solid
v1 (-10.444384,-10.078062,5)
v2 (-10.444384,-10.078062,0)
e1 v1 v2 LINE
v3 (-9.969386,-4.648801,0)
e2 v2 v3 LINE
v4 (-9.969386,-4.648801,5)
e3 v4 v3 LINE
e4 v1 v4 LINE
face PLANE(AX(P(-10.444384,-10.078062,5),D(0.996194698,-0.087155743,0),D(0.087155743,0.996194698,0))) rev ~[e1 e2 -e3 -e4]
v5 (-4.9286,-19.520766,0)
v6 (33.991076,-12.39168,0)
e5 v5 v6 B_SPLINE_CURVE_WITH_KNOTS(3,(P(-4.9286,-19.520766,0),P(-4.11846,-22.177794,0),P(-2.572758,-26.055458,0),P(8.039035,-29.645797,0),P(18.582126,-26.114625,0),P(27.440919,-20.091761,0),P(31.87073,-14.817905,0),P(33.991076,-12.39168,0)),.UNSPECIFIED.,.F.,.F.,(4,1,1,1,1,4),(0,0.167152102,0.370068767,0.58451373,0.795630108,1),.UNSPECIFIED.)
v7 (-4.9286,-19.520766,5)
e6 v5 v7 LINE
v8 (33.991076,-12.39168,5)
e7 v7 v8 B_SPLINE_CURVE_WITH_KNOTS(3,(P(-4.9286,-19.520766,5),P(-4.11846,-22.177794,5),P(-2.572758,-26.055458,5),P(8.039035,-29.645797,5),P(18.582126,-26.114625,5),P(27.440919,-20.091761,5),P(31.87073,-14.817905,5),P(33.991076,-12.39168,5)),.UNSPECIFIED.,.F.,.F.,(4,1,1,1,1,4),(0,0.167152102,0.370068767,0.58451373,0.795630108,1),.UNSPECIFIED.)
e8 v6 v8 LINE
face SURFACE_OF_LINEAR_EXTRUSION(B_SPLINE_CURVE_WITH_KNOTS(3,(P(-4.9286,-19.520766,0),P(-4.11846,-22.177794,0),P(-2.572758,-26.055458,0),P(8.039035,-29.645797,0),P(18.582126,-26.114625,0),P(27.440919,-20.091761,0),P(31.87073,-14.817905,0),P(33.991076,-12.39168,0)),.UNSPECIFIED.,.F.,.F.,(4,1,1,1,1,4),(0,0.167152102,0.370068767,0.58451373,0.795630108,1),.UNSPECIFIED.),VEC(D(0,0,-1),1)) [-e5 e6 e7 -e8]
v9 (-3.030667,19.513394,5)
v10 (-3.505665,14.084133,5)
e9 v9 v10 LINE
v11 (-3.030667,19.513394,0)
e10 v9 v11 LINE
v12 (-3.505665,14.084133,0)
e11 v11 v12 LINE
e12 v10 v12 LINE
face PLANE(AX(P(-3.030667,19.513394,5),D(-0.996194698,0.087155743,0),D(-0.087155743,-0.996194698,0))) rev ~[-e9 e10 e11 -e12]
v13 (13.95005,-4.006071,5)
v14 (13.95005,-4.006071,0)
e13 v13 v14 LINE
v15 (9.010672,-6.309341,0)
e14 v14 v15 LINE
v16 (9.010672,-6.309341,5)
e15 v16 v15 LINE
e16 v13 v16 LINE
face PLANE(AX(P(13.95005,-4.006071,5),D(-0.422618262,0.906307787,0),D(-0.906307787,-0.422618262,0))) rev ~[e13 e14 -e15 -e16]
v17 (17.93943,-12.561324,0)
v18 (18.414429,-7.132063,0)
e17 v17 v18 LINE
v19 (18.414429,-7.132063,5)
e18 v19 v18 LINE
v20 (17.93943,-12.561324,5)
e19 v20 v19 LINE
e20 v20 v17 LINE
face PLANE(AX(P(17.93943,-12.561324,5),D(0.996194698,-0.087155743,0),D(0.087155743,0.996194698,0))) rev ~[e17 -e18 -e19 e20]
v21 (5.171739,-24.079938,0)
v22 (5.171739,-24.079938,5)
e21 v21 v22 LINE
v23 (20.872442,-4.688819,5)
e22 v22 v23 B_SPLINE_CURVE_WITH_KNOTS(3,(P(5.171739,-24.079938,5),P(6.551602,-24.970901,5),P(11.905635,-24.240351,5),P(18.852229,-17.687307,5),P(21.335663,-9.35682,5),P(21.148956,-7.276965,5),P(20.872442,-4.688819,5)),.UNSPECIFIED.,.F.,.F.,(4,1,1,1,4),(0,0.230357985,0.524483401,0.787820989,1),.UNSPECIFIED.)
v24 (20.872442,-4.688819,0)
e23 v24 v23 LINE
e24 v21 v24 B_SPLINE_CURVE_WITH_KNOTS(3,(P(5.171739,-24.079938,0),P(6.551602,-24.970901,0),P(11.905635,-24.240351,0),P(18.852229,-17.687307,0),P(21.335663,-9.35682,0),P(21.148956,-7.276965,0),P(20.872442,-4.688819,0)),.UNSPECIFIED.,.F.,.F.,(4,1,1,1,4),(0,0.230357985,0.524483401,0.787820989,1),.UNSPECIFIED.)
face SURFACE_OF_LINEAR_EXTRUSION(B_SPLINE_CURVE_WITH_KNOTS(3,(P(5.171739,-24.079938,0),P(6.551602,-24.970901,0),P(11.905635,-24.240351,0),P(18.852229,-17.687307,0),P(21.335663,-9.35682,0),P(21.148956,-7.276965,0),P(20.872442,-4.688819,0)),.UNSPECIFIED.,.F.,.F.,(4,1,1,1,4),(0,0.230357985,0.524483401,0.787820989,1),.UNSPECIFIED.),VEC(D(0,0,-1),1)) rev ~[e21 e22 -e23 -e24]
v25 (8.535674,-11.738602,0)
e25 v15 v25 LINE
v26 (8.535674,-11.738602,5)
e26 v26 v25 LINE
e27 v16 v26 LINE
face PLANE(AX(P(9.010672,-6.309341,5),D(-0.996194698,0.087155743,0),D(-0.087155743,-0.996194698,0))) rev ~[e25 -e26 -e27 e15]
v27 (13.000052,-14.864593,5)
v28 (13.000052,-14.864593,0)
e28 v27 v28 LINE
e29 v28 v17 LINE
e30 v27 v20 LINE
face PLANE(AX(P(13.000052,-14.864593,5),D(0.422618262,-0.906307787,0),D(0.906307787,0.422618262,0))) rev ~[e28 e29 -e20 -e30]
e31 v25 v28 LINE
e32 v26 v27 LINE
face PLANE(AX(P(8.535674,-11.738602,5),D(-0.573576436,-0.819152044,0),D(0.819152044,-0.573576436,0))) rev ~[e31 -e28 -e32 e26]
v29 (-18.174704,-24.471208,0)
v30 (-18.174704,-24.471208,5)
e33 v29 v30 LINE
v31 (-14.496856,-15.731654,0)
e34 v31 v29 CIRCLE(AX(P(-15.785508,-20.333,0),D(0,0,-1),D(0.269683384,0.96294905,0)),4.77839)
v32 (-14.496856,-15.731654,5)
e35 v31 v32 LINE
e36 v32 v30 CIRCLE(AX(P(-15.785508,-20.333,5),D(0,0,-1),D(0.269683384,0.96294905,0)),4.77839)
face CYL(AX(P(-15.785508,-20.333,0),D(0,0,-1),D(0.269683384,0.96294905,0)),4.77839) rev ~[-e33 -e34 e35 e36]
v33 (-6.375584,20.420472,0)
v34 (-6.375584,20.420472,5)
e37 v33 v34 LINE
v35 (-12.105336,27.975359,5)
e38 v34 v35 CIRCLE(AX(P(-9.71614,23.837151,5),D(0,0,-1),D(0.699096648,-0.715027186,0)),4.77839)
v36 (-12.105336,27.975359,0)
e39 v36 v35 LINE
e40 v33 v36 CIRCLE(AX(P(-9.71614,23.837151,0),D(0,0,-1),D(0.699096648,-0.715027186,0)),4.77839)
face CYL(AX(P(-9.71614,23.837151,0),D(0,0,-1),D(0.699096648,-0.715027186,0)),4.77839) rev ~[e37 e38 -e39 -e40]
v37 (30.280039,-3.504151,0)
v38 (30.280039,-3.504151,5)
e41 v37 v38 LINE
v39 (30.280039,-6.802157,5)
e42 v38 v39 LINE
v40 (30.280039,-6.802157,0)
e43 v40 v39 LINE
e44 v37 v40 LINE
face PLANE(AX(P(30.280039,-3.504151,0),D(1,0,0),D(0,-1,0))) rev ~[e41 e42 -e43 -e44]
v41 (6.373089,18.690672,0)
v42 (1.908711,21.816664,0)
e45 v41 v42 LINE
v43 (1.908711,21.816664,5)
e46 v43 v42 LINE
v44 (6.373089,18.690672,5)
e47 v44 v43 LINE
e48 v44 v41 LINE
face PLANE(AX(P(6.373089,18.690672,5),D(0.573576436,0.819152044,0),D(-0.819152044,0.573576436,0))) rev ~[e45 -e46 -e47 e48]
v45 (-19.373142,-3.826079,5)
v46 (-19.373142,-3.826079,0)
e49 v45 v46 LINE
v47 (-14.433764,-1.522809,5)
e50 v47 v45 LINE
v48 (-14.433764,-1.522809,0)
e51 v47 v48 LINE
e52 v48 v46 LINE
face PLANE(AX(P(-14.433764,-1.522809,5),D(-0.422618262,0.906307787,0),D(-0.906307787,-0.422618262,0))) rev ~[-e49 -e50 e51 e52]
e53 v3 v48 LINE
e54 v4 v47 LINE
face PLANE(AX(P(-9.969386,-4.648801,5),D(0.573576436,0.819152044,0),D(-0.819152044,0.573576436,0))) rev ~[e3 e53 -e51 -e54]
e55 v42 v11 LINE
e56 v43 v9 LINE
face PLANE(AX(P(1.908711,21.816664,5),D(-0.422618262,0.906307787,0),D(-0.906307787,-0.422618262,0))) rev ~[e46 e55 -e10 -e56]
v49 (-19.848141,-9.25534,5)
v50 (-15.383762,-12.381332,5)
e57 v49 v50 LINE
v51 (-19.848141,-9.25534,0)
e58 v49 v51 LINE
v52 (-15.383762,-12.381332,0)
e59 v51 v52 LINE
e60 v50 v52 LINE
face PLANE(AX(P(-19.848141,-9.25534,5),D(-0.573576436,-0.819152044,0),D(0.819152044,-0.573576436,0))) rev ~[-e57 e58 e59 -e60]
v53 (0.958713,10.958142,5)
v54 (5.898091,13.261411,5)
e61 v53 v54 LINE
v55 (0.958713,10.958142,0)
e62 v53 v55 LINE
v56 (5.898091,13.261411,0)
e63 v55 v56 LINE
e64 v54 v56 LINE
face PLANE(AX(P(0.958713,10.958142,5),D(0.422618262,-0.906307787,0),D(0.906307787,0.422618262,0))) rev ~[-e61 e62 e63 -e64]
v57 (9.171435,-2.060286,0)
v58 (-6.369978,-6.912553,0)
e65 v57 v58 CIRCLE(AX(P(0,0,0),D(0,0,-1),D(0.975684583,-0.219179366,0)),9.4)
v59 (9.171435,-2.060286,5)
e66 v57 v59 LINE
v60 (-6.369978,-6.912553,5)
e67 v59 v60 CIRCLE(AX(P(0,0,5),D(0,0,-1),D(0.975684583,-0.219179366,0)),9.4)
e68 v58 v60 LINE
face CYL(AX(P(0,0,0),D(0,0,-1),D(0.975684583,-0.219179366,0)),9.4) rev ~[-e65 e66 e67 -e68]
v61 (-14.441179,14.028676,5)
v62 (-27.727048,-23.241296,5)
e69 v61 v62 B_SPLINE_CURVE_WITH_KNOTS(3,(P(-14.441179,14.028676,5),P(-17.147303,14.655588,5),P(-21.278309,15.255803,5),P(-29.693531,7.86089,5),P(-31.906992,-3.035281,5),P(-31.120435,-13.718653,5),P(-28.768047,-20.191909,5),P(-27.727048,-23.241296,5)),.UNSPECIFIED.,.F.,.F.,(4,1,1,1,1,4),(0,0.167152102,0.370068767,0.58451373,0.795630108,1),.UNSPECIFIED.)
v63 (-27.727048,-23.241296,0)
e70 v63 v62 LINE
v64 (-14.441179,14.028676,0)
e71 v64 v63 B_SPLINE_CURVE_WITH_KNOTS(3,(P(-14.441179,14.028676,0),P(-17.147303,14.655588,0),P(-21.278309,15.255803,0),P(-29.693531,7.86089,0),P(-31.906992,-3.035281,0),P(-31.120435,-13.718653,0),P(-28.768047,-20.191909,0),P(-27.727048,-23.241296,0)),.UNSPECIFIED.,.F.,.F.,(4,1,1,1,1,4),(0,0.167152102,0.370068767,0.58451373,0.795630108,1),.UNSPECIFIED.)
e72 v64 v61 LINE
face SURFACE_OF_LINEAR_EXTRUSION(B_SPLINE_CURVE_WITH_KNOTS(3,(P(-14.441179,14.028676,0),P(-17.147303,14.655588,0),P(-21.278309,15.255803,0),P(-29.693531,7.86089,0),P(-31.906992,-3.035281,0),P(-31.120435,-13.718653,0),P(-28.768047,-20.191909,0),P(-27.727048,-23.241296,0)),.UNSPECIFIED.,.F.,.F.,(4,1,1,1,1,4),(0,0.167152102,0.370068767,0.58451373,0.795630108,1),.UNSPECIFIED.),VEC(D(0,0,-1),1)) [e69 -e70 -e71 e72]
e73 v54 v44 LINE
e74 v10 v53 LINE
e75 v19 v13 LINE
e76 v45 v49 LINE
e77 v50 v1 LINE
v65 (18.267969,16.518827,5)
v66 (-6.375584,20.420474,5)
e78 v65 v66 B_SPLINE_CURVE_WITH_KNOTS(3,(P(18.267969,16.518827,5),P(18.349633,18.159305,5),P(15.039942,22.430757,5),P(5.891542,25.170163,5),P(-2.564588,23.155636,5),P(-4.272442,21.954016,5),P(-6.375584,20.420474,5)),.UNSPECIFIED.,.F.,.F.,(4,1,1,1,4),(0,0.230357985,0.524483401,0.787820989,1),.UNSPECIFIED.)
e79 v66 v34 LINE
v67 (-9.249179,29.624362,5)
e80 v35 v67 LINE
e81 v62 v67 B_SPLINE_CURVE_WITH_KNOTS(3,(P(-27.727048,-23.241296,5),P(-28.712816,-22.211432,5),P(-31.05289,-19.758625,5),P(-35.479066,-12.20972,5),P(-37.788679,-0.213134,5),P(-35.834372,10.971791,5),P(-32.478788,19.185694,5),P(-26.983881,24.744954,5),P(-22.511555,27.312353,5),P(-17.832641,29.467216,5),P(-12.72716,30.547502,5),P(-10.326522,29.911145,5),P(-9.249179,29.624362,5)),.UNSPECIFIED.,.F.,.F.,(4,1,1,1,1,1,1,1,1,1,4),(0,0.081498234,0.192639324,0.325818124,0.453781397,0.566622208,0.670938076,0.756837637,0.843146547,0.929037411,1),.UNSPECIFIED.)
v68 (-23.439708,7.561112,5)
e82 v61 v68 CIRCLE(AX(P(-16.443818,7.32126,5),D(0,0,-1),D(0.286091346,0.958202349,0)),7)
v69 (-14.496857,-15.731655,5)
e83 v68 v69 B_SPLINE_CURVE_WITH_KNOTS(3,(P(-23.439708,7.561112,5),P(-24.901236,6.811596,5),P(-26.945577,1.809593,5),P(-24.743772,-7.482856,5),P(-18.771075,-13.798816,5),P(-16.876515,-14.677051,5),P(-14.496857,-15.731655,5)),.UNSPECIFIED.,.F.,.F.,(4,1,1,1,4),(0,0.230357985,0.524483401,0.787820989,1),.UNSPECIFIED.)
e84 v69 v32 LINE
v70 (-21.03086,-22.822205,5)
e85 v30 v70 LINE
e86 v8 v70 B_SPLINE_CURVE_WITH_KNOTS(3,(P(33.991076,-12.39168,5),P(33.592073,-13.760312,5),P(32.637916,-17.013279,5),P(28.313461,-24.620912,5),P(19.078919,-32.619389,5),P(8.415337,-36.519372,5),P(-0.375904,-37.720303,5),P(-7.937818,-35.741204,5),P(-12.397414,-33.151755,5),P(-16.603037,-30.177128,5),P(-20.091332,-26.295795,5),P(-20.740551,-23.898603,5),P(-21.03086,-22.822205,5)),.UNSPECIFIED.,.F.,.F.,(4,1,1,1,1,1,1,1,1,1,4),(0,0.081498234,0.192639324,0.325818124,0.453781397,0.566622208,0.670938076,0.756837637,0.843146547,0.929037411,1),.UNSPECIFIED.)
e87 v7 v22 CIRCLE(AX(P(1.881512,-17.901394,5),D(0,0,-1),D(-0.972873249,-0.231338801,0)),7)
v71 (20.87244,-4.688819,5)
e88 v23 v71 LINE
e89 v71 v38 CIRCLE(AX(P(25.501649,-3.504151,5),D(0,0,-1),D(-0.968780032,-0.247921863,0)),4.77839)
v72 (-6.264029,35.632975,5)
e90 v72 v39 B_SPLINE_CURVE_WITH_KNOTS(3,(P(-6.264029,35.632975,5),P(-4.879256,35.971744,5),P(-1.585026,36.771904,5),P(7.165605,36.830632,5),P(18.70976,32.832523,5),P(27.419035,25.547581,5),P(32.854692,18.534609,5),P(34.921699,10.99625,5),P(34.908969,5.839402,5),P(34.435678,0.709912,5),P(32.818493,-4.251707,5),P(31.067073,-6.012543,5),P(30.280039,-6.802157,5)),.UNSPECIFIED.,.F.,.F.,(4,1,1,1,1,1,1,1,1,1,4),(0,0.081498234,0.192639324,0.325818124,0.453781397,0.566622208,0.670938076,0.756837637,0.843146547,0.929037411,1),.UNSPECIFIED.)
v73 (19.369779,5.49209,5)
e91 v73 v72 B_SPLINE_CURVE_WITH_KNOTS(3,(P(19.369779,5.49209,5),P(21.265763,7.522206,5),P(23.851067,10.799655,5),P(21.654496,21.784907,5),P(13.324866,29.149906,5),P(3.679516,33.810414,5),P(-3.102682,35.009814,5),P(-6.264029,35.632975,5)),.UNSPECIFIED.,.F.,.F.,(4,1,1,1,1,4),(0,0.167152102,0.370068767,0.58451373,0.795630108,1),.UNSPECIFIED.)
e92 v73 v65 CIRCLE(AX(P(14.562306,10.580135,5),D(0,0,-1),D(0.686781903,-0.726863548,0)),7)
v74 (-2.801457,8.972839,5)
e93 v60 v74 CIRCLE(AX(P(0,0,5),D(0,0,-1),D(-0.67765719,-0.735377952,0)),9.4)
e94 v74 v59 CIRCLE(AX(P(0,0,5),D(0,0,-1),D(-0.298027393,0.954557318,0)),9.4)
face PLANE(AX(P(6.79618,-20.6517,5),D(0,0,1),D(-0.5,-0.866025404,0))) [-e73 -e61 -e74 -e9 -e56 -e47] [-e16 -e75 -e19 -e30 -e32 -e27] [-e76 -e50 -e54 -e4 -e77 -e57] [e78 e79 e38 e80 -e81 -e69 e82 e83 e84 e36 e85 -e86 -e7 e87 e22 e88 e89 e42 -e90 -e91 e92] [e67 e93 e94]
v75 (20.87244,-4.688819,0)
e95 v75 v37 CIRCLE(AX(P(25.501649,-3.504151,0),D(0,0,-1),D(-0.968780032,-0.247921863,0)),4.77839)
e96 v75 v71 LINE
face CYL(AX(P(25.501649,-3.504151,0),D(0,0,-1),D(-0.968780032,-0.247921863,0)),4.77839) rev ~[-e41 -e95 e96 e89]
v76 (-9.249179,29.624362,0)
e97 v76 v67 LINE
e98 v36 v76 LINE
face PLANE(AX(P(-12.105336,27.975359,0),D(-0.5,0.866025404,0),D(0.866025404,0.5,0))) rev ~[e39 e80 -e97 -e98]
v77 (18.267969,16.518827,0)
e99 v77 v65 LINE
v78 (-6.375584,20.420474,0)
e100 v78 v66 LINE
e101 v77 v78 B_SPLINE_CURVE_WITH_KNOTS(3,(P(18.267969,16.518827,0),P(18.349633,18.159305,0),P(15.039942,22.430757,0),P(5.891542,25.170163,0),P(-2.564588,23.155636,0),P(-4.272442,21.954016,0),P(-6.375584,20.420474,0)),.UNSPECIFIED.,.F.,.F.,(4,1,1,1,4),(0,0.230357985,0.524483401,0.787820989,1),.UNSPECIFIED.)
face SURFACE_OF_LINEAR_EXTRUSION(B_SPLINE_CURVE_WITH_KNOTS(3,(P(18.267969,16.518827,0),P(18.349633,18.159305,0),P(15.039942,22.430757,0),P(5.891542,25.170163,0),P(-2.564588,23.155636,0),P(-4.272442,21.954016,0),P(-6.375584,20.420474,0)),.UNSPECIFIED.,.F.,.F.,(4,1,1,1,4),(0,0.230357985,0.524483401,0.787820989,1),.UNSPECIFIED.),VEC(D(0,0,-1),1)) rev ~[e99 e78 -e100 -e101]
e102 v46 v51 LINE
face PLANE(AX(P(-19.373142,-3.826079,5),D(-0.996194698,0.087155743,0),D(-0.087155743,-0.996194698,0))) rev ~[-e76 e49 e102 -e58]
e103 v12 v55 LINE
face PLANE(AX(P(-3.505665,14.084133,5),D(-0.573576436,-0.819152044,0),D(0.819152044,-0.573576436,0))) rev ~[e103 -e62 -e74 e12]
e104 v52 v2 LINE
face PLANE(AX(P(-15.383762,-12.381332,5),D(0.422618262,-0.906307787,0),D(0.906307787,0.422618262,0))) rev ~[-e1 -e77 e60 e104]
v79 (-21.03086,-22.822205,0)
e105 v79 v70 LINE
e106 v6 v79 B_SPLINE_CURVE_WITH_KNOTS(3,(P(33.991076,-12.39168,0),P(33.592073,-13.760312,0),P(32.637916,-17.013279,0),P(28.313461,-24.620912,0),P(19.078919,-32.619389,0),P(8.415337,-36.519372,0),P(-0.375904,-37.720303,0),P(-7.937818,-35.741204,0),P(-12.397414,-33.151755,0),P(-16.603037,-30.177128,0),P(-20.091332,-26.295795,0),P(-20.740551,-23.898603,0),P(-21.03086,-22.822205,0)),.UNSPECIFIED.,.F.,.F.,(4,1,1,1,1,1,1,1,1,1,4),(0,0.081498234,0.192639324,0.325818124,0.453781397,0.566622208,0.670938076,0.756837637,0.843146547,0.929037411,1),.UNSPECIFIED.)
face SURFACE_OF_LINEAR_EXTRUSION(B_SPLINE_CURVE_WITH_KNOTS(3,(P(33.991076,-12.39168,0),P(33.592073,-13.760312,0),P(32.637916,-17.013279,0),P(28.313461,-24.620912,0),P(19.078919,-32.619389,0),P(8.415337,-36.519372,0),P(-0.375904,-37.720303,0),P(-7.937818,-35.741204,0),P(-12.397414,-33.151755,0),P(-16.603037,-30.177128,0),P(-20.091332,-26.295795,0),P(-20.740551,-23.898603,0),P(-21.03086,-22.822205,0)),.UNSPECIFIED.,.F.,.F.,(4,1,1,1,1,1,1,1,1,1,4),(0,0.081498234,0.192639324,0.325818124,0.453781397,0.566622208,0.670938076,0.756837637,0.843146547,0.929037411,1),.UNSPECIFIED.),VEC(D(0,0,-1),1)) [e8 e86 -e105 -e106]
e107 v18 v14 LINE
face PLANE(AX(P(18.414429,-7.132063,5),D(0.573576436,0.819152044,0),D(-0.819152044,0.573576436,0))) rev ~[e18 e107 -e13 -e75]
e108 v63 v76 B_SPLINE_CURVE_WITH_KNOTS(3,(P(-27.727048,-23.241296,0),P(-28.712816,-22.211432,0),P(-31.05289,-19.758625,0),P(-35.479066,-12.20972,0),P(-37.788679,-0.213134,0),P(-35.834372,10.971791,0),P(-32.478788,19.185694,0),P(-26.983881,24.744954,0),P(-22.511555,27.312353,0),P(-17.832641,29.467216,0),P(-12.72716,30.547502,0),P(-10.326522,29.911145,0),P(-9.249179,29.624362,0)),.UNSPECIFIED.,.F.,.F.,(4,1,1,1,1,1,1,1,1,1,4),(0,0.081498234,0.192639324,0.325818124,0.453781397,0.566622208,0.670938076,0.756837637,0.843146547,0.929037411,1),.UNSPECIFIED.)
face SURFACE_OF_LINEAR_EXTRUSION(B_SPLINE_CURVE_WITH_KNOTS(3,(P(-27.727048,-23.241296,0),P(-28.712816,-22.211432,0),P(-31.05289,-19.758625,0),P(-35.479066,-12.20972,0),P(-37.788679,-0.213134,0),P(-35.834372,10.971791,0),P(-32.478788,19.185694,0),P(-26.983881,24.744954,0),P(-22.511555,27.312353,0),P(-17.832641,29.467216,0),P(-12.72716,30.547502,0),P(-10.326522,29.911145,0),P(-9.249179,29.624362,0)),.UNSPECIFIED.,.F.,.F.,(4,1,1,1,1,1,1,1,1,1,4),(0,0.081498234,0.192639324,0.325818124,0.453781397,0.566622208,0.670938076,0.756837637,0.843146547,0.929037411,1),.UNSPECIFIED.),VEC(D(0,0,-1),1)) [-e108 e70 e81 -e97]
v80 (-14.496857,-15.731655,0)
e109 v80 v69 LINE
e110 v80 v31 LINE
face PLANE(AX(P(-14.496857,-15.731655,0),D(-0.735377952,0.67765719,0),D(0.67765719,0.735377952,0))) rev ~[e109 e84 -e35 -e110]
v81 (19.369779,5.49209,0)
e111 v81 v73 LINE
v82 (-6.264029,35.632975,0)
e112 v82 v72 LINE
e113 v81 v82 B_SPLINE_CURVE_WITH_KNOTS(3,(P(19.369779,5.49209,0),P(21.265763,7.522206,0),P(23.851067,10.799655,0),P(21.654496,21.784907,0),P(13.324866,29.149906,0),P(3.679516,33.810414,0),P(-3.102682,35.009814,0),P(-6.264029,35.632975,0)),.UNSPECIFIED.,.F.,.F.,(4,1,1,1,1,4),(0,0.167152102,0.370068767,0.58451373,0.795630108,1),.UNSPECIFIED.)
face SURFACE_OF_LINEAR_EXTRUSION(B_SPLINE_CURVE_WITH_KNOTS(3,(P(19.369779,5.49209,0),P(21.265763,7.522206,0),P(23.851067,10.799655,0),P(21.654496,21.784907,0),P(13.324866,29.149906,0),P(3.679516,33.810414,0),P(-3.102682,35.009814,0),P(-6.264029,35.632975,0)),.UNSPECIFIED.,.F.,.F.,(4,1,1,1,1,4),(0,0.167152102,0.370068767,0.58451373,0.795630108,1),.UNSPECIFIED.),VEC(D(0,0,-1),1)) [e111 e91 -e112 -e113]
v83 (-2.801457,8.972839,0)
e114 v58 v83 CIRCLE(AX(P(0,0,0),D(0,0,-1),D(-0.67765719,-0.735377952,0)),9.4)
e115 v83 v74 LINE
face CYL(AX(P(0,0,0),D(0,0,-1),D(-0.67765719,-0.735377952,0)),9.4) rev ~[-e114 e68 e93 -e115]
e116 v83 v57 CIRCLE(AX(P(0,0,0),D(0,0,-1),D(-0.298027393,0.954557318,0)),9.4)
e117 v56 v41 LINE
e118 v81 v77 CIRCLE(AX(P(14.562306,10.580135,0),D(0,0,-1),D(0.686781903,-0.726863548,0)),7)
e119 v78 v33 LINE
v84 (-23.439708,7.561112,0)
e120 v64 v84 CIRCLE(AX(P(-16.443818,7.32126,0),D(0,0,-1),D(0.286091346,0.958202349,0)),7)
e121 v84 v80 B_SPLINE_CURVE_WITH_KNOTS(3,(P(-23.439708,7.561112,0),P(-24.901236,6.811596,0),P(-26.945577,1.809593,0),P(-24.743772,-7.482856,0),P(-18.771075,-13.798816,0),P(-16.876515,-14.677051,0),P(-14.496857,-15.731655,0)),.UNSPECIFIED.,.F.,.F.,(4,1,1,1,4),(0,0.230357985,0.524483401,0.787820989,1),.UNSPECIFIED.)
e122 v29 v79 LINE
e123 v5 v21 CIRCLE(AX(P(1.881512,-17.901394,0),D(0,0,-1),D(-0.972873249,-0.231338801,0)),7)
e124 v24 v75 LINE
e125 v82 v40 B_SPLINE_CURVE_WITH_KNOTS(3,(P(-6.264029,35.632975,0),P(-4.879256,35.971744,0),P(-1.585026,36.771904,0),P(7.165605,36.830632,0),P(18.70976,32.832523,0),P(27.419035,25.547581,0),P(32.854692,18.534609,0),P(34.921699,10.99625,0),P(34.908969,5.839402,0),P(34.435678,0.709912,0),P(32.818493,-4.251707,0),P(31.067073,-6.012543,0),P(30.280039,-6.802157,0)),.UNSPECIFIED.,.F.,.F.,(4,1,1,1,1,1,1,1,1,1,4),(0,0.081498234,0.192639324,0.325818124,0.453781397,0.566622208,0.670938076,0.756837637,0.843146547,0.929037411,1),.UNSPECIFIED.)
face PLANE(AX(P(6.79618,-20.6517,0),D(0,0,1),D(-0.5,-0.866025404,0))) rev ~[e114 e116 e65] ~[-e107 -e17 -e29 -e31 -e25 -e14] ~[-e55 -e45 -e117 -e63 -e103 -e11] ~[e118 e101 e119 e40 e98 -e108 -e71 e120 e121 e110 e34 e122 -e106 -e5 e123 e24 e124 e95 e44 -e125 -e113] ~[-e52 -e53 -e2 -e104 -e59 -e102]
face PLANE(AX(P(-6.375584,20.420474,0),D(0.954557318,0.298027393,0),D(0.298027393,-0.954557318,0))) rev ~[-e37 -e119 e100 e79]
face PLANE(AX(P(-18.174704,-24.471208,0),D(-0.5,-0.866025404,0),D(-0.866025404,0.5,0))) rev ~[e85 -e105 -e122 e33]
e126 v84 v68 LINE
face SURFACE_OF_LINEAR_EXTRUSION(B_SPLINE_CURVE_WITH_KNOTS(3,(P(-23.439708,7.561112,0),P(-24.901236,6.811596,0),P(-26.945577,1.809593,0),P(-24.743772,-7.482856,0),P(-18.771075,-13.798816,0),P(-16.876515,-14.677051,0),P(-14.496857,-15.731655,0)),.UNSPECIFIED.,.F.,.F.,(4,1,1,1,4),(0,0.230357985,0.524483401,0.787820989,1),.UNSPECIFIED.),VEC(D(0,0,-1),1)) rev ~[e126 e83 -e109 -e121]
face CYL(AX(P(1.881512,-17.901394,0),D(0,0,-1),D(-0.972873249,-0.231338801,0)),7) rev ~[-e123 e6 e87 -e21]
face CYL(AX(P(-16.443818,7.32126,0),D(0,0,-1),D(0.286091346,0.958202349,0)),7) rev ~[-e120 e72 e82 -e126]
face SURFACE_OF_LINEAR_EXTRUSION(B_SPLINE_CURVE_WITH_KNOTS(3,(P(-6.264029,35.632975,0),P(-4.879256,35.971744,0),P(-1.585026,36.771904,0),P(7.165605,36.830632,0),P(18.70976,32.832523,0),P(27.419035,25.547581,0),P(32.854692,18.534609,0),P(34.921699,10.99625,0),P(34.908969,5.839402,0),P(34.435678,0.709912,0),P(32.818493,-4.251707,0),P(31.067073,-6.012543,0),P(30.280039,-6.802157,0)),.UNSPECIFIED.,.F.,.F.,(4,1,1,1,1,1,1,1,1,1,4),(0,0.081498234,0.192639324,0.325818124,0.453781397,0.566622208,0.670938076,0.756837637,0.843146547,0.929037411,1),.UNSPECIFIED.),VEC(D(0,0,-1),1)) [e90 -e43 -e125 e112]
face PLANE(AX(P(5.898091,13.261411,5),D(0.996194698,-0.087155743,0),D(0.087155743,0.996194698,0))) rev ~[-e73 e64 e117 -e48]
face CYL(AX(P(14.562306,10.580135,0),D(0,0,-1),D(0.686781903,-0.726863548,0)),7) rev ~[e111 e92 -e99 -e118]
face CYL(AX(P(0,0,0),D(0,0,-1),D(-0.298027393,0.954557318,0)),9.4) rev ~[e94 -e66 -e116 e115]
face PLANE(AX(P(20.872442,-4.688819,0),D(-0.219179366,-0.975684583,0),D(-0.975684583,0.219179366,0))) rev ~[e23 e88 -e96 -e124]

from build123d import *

# Parameters (mm, degrees)
F1_DEPTH = 5
F3_COUNT = 3
F5_DEPTH = 25


# Not quite as in the source:
# - a feature names something its author has since deleted; it is built from what else it names


with BuildPart() as f1:
    # F0 (on Top) → F1 (new body)
    with BuildSketch(Plane.XY):
        with BuildLine():
            ThreePointArc((19.3697792191, 5.4920897032), (7.5969915996, 9.8841483966), (18.2679687724, 16.5188265409))
            add(Edge.make_bspline(
                [(18.2679687724, 16.5188265409), (18.3496331671, 18.159304569), (15.0399422234, 22.4307572674), (5.8915424323, 25.1701629139), (-2.5645877448, 23.1556361007), (-4.2724416569, 21.9540160804), (-6.3755843906, 20.4204743588)],
                knots=[0, 0, 0, 0, 0.2303579847, 0.5244834011, 0.7878209886, 1, 1, 1, 1], degree=3))
            Line((-6.3755843906, 20.4204743588), (-2.8014574936, 8.9728387878))
            ThreePointArc((-2.8014574936, 8.9728387878), (6.3699775875, 6.9125527509), (9.1714350811, -2.0602860368))
            Line((9.1714350811, -2.0602860368), (20.8724397691, -4.6888186888))
            ThreePointArc((20.8724397691, -4.6888186888), (24.9046372172, 1.2367971287), (30.2800393035, -3.5041512456))
            Line((30.2800393035, -3.5041512456), (30.2800393035, -6.8021570911))
            add(Edge.make_bspline(
                [(-6.2640286051, 35.6329753995), (-4.879256488, 35.9717442203), (-1.585026432, 36.7719038353), (7.1656047644, 36.8306324291), (18.7097595399, 32.8325229218), (27.4190354107, 25.5475811449), (32.854692365, 18.5346088809), (34.9216993048, 10.9962495512), (34.9089688496, 5.8394018473), (34.4356780994, 0.7099122454), (32.81849257, -4.2517065064), (31.0670725646, -6.0125426883), (30.2800393035, -6.8021570911)],
                knots=[0, 0, 0, 0, 0.0814982335, 0.1926393238, 0.3258181235, 0.4537813969, 0.5666222077, 0.6709380758, 0.7568376371, 0.8431465468, 0.9290374106, 1, 1, 1, 1], degree=3))
            add(Edge.make_bspline(
                [(19.3697792191, 5.4920897032), (21.2657632456, 7.5222061316), (23.8510672601, 10.7996552166), (21.6544956387, 21.7849070989), (13.3248656234, 29.1499061822), (3.6795158583, 33.8104137468), (-3.1026823793, 35.0098141612), (-6.2640286051, 35.6329753995)],
                knots=[0, 0, 0, 0, 0.167152102, 0.3700687673, 0.5845137295, 0.7956301076, 1, 1, 1, 1], degree=3))
        make_face()
    extrude(amount=F1_DEPTH)

    # F3: F1 ×3 about axis
    f3_axis = Axis((0, 0, 27.9298778623), (0, 0, 1))


with BuildPart() as f1_1:
    add(f1.part)
    for i in range(1, F3_COUNT):
        add(f1.part.rotate(f3_axis, i * 360 / F3_COUNT))

    # F4 (on face) → F5 (cut)
    with BuildSketch(Plane.XY.offset(5)):
        Polygon((-3.5056654712, 14.0841332571), (0.9587131702, 10.958141679), (5.8980906096, 13.2614112055), (6.3730894075, 18.6906723101), (1.9087107662, 21.8166638882), (-3.0306666732, 19.5133943617), align=None)
        Polygon((13.0000523306, -14.8645934826), (17.9394297699, -12.5613239561), (18.4144285679, -7.1320628515), (13.9500499265, -4.0060712734), (9.0106724872, -6.3093407999), (8.5356736892, -11.7386019045), align=None)
        Polygon((-19.3731417381, -3.8260788275), (-19.8481405361, -9.2553399321), (-15.3837618947, -12.3813315102), (-10.4443844554, -10.0780619837), (-9.9693856574, -4.6488008791), (-14.4337642988, -1.522809301), align=None)
    extrude(amount=-F5_DEPTH, mode=Mode.SUBTRACT)


solid = f1_1.part
